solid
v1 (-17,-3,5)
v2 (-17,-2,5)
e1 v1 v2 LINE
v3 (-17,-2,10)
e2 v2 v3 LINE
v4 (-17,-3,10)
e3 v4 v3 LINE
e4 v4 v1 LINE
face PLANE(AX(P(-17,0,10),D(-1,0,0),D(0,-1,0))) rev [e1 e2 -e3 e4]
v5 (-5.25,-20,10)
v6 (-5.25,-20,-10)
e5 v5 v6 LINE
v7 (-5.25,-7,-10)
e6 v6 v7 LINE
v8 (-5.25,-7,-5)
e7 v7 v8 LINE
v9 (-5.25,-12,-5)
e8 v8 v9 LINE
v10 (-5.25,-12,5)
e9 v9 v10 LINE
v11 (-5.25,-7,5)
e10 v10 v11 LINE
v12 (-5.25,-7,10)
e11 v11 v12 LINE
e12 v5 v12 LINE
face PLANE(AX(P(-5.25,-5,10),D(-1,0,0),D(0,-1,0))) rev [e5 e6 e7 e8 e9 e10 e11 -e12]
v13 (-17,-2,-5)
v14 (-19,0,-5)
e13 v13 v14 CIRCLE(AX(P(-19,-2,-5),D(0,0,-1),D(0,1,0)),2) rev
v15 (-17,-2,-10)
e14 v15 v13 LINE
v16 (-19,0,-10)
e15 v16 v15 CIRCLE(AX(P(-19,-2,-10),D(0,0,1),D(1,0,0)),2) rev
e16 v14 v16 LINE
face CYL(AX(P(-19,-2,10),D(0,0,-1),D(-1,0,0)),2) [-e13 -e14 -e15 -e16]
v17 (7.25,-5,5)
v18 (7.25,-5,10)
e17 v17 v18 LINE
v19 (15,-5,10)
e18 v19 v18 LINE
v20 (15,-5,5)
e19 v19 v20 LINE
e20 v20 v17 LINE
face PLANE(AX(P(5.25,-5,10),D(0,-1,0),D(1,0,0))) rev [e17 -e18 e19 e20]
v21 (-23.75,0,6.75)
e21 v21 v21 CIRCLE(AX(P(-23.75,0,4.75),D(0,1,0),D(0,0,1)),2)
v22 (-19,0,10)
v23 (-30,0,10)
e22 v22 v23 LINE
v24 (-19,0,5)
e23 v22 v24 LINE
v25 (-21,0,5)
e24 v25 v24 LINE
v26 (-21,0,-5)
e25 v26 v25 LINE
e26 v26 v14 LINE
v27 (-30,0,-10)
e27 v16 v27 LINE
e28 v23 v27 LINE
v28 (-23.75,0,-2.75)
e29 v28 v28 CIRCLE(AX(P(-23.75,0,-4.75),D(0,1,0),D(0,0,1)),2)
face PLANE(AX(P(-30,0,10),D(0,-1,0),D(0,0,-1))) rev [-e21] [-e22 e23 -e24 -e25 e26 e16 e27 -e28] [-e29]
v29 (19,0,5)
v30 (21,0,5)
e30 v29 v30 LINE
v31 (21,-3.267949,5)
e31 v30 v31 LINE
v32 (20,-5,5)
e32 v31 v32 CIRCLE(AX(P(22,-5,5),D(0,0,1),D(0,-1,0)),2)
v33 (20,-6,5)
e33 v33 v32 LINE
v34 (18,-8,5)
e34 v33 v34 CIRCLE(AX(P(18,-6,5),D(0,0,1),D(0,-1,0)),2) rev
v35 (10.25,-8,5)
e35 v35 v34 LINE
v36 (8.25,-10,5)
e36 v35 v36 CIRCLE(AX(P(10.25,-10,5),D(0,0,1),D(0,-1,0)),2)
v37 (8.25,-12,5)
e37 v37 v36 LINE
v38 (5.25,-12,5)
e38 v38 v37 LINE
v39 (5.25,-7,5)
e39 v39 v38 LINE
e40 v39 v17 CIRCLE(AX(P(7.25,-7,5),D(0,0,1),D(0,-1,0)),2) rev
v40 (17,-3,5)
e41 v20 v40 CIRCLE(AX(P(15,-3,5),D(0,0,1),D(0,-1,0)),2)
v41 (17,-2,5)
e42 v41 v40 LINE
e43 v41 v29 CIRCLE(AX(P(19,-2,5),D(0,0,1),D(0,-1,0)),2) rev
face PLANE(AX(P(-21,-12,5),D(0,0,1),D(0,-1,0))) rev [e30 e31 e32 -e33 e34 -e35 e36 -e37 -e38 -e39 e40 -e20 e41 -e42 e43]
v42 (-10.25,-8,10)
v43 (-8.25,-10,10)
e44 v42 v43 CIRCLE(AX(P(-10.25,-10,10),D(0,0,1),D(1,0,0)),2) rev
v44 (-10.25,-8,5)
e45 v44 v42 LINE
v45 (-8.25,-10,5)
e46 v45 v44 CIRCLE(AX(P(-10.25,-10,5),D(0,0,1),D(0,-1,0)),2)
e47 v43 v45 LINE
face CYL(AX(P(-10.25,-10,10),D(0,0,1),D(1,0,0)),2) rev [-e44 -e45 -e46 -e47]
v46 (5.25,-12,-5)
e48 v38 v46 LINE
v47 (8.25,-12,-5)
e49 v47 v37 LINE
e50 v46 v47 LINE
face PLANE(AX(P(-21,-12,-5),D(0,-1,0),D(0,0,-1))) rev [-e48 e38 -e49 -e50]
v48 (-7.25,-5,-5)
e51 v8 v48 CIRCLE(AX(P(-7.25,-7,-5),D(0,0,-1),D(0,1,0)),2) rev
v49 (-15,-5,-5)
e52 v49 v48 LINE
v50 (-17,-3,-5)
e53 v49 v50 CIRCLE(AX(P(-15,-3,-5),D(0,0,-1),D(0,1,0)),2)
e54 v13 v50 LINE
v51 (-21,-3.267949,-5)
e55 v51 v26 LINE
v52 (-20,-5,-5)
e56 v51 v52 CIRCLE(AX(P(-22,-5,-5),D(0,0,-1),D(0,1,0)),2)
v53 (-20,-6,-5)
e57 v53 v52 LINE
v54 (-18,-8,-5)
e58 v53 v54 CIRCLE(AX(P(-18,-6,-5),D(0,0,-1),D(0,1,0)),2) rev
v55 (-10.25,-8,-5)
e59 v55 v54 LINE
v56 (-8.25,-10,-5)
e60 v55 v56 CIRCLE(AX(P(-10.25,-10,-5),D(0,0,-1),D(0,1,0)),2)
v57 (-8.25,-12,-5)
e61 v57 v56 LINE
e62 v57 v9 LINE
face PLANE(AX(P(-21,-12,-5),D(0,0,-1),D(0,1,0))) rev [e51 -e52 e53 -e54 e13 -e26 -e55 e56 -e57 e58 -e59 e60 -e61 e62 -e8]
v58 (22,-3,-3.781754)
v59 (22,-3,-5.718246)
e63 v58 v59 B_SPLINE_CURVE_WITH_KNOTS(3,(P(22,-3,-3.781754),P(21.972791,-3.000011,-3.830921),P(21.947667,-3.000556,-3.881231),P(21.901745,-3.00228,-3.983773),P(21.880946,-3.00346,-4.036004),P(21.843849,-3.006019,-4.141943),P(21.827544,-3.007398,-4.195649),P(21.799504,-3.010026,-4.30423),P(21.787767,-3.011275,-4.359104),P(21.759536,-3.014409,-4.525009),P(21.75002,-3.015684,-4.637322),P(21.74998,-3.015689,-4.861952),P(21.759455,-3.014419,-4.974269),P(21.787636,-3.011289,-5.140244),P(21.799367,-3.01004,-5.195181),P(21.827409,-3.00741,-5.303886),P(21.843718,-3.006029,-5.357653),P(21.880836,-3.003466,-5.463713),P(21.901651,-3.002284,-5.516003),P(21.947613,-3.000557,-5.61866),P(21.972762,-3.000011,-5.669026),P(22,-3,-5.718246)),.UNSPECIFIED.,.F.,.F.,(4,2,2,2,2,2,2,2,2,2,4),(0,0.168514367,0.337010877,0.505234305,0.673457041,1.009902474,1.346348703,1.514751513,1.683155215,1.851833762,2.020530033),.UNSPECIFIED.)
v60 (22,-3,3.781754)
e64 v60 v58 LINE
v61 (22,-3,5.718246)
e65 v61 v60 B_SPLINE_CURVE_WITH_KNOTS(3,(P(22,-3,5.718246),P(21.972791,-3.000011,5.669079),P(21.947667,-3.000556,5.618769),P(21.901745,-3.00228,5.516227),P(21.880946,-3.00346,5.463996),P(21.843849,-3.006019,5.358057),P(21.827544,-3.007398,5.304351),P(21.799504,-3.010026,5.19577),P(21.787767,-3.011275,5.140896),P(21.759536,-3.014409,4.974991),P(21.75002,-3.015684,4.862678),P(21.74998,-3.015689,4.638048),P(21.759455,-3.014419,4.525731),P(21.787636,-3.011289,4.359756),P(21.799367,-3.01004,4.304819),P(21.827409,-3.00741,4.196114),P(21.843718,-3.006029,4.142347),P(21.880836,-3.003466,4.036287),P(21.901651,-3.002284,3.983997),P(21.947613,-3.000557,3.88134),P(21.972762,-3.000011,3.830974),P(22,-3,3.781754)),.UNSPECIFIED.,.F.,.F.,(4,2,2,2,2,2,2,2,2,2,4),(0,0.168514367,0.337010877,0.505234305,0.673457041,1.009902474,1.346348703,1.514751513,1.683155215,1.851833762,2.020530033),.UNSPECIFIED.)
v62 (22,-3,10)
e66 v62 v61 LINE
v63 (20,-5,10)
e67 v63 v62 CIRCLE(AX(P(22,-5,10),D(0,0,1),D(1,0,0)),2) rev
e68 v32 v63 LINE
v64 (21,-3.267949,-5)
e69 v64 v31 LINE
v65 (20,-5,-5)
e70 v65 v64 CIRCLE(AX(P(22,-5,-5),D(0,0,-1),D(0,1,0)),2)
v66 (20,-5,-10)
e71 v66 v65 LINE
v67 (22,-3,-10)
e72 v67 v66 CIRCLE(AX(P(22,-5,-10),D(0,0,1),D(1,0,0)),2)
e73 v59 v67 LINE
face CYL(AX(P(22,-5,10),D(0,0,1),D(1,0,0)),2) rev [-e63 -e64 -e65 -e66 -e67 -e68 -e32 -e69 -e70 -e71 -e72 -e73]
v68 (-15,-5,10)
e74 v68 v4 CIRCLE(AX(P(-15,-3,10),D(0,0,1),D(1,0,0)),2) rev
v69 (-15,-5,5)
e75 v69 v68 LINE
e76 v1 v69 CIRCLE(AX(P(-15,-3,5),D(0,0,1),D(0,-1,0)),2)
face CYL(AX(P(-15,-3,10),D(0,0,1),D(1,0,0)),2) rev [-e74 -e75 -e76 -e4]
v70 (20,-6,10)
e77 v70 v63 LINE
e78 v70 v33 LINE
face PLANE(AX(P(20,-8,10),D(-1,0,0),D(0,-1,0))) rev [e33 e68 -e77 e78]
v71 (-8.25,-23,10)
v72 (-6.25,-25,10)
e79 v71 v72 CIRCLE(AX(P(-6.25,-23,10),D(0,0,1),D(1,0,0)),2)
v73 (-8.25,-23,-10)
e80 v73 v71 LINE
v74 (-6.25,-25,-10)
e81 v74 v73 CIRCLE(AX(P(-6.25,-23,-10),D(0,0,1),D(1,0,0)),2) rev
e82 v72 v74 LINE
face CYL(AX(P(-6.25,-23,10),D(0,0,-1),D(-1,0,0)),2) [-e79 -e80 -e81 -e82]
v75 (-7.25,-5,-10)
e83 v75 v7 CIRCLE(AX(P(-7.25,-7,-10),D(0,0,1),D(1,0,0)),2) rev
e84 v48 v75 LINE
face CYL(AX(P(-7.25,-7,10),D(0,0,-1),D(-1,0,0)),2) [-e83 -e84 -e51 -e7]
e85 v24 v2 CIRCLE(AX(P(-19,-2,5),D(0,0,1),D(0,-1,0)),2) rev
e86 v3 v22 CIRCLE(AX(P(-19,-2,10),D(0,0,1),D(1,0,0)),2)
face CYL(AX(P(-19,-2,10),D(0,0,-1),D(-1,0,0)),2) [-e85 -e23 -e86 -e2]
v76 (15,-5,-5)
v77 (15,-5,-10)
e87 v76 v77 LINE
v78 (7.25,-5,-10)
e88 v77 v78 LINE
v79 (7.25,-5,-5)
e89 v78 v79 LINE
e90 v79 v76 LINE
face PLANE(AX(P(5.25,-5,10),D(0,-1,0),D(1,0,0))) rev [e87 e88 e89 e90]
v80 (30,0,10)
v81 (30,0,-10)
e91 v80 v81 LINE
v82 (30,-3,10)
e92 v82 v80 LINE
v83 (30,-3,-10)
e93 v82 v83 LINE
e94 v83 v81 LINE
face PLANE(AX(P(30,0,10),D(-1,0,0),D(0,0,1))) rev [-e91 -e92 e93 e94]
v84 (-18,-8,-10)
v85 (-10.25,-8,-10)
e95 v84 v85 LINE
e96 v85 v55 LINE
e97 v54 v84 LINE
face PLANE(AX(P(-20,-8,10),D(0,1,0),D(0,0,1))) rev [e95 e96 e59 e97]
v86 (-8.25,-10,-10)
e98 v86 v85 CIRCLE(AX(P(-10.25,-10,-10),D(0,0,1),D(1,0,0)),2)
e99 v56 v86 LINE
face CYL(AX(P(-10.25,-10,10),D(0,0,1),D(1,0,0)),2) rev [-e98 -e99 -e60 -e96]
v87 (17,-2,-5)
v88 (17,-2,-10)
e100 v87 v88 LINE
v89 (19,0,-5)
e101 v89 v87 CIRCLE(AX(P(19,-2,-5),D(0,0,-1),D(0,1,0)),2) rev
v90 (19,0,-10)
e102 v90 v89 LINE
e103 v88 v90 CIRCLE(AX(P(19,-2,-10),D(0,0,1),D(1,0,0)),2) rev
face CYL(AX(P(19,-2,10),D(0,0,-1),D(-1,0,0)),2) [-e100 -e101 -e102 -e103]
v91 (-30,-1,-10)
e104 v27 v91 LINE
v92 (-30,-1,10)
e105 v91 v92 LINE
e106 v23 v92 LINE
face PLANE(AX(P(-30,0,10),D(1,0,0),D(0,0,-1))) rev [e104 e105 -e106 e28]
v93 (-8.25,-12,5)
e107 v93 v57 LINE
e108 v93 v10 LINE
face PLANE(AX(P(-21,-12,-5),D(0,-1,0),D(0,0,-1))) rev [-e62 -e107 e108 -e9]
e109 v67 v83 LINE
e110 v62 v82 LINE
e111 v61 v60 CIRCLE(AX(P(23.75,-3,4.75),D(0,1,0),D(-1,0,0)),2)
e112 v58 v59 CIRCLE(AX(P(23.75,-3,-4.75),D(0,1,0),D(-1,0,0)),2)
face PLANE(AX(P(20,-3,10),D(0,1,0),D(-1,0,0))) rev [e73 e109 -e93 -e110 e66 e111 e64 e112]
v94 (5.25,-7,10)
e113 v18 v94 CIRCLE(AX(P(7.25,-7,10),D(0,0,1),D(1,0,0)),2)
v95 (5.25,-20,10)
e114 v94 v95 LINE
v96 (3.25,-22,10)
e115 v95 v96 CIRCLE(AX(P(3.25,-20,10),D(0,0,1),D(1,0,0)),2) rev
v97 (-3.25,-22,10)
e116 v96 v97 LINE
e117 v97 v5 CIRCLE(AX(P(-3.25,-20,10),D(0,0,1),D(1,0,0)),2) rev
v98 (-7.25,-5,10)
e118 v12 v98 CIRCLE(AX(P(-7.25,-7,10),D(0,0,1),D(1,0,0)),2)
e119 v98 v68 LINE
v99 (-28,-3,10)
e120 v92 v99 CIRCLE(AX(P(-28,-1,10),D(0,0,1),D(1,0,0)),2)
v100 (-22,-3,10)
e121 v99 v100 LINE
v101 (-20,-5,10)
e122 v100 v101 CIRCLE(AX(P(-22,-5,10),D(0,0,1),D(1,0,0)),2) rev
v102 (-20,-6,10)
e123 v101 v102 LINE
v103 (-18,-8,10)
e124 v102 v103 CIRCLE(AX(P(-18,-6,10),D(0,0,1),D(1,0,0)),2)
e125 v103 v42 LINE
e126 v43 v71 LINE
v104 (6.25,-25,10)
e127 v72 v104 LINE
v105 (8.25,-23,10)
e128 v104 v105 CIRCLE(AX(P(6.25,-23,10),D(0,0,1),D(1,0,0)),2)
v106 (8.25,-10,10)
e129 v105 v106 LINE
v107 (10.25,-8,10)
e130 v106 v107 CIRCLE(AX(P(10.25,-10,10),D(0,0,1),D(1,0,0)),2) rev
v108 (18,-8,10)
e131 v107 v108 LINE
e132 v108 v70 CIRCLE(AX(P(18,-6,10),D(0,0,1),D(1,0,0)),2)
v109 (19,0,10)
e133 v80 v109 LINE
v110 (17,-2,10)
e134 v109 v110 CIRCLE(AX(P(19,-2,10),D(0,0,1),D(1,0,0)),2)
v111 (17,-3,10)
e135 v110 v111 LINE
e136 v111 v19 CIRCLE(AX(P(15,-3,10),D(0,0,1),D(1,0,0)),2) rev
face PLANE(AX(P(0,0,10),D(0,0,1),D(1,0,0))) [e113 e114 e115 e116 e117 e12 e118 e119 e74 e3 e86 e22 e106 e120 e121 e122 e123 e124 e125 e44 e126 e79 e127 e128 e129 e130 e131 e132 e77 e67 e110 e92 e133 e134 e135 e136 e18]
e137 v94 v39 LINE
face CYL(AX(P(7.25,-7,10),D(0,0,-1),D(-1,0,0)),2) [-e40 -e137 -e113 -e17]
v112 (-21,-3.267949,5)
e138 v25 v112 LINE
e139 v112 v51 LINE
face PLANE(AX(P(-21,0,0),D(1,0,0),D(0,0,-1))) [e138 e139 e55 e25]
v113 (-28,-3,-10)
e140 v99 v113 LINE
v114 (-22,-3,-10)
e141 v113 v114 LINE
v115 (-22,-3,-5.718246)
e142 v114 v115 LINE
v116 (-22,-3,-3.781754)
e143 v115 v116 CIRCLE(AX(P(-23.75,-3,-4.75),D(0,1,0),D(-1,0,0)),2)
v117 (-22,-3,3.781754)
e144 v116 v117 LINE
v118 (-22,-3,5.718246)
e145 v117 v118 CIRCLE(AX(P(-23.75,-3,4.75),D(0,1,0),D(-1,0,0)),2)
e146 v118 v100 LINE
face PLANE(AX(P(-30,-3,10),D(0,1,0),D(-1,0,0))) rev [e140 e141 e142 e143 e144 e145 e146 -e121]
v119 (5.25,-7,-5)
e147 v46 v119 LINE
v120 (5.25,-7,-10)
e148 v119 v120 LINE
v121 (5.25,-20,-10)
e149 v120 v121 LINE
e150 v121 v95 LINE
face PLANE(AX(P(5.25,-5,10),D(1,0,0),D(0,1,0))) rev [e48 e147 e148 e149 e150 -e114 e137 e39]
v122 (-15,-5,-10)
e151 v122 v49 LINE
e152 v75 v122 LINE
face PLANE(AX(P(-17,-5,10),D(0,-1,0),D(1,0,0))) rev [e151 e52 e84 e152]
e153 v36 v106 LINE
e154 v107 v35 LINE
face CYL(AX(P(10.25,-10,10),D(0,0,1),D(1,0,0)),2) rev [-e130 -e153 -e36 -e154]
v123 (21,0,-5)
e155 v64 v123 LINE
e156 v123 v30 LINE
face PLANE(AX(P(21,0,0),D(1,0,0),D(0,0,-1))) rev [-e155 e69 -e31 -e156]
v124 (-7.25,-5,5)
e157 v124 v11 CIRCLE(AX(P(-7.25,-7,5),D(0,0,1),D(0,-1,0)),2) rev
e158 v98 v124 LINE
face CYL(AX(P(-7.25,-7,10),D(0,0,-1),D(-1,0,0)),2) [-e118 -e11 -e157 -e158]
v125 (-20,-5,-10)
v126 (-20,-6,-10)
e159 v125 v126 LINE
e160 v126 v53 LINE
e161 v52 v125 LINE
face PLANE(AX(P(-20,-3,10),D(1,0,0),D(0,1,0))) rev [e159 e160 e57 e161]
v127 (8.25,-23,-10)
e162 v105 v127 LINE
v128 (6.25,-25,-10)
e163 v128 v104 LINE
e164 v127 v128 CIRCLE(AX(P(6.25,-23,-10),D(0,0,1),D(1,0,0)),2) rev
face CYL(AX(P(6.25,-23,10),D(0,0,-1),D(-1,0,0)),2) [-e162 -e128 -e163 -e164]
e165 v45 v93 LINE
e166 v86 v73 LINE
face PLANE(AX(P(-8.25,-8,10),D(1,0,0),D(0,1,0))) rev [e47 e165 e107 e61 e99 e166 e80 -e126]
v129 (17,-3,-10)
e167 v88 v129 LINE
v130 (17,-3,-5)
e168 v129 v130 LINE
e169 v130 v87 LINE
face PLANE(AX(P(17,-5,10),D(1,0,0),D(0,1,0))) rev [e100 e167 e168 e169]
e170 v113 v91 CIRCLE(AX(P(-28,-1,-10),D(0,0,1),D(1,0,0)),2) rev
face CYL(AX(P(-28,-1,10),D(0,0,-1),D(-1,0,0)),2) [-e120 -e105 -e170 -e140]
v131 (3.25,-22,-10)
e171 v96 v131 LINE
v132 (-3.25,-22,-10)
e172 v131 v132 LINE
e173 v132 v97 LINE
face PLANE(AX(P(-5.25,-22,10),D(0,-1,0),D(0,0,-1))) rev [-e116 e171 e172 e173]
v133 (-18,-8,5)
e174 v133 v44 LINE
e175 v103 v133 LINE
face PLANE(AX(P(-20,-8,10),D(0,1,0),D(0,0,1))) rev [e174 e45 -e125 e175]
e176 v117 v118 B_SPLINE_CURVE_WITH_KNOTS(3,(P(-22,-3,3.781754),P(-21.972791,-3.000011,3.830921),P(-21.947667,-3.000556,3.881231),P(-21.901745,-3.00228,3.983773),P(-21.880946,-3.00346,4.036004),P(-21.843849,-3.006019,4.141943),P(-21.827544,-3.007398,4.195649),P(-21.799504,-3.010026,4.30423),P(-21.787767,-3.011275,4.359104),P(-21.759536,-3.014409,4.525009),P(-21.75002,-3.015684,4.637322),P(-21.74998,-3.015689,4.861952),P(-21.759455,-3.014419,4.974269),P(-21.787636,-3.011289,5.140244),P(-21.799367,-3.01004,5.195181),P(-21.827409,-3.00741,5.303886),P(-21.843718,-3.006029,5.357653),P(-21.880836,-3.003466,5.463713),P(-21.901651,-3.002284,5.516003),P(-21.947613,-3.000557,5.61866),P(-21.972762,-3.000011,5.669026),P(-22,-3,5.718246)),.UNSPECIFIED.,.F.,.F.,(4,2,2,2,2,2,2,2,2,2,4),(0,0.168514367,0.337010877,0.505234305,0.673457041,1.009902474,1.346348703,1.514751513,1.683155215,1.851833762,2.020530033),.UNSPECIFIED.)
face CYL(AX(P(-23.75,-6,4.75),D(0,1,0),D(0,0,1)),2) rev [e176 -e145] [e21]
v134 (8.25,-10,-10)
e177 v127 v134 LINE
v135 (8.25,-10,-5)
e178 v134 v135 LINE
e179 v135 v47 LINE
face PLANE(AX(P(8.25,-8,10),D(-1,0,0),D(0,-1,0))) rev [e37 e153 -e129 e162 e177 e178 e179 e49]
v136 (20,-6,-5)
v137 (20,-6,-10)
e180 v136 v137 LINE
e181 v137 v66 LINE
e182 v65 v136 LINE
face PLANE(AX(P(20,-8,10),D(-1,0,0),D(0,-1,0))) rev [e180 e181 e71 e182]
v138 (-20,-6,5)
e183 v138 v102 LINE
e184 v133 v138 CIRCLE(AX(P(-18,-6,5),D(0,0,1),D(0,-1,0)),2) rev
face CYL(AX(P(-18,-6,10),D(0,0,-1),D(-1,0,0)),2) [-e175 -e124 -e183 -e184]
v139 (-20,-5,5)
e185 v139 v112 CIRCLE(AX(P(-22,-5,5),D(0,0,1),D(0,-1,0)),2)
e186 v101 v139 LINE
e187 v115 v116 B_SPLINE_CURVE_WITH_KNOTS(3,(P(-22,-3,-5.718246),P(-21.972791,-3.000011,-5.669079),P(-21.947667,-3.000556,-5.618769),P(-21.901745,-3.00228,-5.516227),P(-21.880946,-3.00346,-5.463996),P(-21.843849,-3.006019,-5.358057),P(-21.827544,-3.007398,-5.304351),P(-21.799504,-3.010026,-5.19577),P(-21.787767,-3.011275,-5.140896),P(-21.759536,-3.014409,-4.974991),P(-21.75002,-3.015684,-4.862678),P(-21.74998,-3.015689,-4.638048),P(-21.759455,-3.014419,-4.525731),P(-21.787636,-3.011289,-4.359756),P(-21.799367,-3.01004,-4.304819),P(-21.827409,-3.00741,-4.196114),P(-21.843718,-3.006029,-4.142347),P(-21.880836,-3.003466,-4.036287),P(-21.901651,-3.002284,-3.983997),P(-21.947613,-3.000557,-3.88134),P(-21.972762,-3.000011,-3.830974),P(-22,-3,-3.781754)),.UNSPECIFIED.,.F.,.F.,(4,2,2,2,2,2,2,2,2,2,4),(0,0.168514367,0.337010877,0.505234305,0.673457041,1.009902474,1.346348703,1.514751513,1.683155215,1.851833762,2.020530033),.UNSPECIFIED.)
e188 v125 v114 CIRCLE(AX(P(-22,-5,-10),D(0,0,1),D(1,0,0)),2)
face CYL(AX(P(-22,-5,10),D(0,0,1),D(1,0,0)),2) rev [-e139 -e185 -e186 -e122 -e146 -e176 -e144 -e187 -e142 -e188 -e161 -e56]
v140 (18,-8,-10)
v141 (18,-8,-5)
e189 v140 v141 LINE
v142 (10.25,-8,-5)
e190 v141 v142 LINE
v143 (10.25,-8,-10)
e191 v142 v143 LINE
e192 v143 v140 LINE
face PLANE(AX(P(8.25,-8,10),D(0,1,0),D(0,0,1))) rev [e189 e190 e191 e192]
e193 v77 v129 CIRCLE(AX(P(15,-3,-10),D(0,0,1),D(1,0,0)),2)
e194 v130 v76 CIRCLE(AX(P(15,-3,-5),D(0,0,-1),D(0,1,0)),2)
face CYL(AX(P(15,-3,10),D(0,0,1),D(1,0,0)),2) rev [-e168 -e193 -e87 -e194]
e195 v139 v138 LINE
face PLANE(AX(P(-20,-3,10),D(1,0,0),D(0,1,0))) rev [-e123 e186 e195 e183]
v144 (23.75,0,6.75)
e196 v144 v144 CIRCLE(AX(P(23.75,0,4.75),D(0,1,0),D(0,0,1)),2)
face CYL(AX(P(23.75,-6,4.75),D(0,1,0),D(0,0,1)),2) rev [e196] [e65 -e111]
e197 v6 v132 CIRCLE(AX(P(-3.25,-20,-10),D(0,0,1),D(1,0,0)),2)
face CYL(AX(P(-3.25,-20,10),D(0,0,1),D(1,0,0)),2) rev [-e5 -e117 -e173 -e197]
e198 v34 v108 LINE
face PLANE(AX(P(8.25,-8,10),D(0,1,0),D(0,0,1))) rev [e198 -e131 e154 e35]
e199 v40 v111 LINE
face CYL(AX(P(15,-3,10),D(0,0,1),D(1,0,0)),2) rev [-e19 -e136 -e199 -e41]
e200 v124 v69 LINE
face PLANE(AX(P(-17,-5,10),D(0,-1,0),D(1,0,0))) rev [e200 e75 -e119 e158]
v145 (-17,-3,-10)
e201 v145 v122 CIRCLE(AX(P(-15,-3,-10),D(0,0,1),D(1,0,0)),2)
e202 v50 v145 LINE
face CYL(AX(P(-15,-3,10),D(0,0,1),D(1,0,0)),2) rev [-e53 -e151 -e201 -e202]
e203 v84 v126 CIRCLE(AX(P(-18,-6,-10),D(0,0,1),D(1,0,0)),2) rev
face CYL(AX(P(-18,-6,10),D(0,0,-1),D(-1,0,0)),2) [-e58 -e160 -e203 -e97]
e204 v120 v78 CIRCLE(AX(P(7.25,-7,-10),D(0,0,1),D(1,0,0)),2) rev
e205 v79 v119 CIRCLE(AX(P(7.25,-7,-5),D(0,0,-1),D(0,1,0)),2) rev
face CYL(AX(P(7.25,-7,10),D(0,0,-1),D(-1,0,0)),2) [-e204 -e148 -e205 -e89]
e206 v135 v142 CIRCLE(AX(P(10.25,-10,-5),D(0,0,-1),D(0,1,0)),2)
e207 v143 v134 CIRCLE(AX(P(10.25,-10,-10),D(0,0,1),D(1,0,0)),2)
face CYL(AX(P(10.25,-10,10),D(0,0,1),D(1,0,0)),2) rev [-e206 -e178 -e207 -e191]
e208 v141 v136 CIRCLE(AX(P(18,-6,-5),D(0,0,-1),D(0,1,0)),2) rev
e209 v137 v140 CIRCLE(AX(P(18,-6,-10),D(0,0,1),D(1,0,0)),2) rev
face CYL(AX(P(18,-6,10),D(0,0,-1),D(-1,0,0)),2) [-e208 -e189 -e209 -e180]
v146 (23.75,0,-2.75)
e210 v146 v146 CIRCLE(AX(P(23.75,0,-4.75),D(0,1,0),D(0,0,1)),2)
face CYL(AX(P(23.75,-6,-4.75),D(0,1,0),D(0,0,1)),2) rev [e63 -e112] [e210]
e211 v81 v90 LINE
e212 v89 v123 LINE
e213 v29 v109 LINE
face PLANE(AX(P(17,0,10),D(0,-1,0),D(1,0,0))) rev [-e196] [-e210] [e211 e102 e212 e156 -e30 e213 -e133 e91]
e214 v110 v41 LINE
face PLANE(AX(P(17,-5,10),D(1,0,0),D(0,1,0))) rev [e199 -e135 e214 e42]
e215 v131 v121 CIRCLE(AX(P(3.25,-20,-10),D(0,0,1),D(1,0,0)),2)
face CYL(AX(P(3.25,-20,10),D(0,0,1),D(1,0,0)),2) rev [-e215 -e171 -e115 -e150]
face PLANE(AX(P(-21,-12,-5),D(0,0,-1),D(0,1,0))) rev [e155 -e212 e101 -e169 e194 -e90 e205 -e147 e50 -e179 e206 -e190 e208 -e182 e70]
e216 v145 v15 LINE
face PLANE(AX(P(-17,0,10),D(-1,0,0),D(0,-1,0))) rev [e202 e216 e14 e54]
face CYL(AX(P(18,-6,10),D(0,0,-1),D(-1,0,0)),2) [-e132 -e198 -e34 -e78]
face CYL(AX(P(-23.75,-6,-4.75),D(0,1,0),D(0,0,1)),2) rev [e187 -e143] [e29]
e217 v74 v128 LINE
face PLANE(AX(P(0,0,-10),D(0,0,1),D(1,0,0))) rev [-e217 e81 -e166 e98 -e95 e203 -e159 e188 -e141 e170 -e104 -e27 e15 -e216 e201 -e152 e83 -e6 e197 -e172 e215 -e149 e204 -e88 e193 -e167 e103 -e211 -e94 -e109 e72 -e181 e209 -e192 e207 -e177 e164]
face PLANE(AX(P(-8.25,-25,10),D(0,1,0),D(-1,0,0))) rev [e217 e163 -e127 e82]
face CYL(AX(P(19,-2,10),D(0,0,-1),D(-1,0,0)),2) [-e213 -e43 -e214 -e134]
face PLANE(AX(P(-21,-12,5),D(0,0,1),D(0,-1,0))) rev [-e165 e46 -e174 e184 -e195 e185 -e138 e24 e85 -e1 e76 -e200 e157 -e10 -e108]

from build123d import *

# Parameters (mm, degrees)
BOSS_EXTRUDE1_DEPTH = 10
SKETCH2_R           = 2
CUT_EXTRUDE1_DEPTH  = 6
SKETCH3_W           = 10
SKETCH3_H           = 12
CUT_EXTRUDE2_DEPTH  = 21
FILLET1_R           = 2


with BuildPart() as part:
    # Sketch1 → Boss-Extrude1 (new, symmetric)
    with BuildSketch(Plane.XY):
        Polygon((-30, 0), (-17, 0), (-17, -5), (-5.25, -5), (-5.25, -22), (5.25, -22), (5.25, -5), (17, -5), (17, 0), (30, 0), (30, -3), (20, -3), (20, -8), (8.25, -8), (8.25, -25), (-8.25, -25), (-8.25, -8), (-20, -8), (-20, -3), (-30, -3), align=None)
    extrude(amount=BOSS_EXTRUDE1_DEPTH, both=True)

    # Sketch2 → Cut-Extrude1 (cut)
    with BuildSketch(Plane(origin=(0, 0, 0), x_dir=(1, 0, 0), z_dir=(0, 1, 0))):
        with Locations(Location((-23.75, 4.75, 0), (0, 0, 270))):
            Circle(SKETCH2_R)
        with Locations(Location((-23.75, -4.75, 0), (0, 0, 270))):
            Circle(SKETCH2_R)
        with Locations(Location((23.75, 4.75, 0), (0, 0, 270))):
            Circle(SKETCH2_R)
        with Locations(Location((23.75, -4.75, 0), (0, 0, 270))):
            Circle(SKETCH2_R)
    extrude(amount=-CUT_EXTRUDE1_DEPTH, mode=Mode.SUBTRACT)

    # Sketch3 → Cut-Extrude2 (cut, symmetric)
    with BuildSketch(Plane(origin=(0, 0, 0), x_dir=(0, 0, -1), z_dir=(1, 0, 0))):
        with Locations((0, -6)):
            Rectangle(SKETCH3_W, SKETCH3_H)
    extrude(amount=CUT_EXTRUDE2_DEPTH, both=True, mode=Mode.SUBTRACT)

    # Fillet1
    # the kernel refuses this fillet: 2 mm, written as the material it adds along each edge
    with BuildSketch(Plane(origin=(-17, -5, 10), x_dir=(0, 1, 0), z_dir=(0, 0, -1)), Plane(origin=(17, -5, 10), x_dir=(-1, 0, 0), z_dir=(0, 0, -1)), Plane(origin=(8.25, -8, 10), x_dir=(1, 0, 0), z_dir=(0, 0, -1)), Plane(origin=(-8.25, -8, 10), x_dir=(0, -1, 0), z_dir=(0, 0, -1)), Plane(origin=(-17, -5, -5), x_dir=(0, 1, 0), z_dir=(0, 0, -1)), Plane(origin=(17, -5, -5), x_dir=(-1, 0, 0), z_dir=(0, 0, -1)), Plane(origin=(-8.25, -8, -5), x_dir=(0, -1, 0), z_dir=(0, 0, -1))) as fillet1_piece_1:
        with BuildLine():
            CenterArc((FILLET1_R, FILLET1_R), FILLET1_R, 180, 90)
            Line((0, FILLET1_R), (0, 0))
            Line((0, 0), (FILLET1_R, 0))
        make_face()
    extrude(amount=5)
    with BuildSketch(Plane(origin=(-5.25, -22, 10), x_dir=(0, 1, 0), z_dir=(0, 0, -1)), Plane(origin=(5.25, -22, 10), x_dir=(-1, 0, 0), z_dir=(0, 0, -1))) as fillet1_piece_2:
        with BuildLine():
            CenterArc((FILLET1_R, FILLET1_R), FILLET1_R, 180, 90)
            Line((0, FILLET1_R), (0, 0))
            Line((0, 0), (FILLET1_R, 0))
        make_face()
    extrude(amount=20)
    with BuildSketch(Plane(origin=(20, -3, 10), x_dir=(1, 0, 0), z_dir=(0, 0, -1))) as fillet1_piece_3_section:
        with BuildLine():
            CenterArc((FILLET1_R, FILLET1_R), FILLET1_R, 180, 90)
            Line((0, FILLET1_R), (0, 0))
            Line((0, 0), (FILLET1_R, 0))
        make_face()
    fillet1_piece_3 = extrude(amount=5, mode=Mode.PRIVATE)
    fillet1_piece_3 = split(fillet1_piece_3, bisect_by=Plane(origin=(21, -3.048479196, 7.515597856), z_dir=(1, 0, 0)), keep=Keep.TOP, mode=Mode.PRIVATE)
    fillet1_piece_3 = fillet1_piece_3 - Plane(origin=(23.75, -3.048479196, 4.75), x_dir=(0, 0, 1), z_dir=(0, 1, 0)) * Cylinder(2, 18, mode=Mode.PRIVATE)
    add(fillet1_piece_3)
    with BuildSketch(Plane(origin=(20, -3, 10), x_dir=(1, 0, 0), z_dir=(0, 0, -1))) as fillet1_piece_4_section:
        with BuildLine():
            CenterArc((FILLET1_R, FILLET1_R), FILLET1_R, 180, 90)
            Line((0, FILLET1_R), (0, 0))
            Line((0, 0), (FILLET1_R, 0))
        make_face()
    fillet1_piece_4 = extrude(amount=5, mode=Mode.PRIVATE)
    fillet1_piece_4 = split(fillet1_piece_4, bisect_by=Plane(origin=(21, -3.51024012, 7.5), z_dir=(-1, 0, 0)), keep=Keep.TOP, mode=Mode.PRIVATE)
    add(fillet1_piece_4)
    with BuildSketch(Plane(origin=(20, -3, 10), x_dir=(1, 0, 0), z_dir=(0, 0, -1))) as fillet1_piece_5_section:
        with BuildLine():
            CenterArc((FILLET1_R, FILLET1_R), FILLET1_R, 180, 90)
            Line((0, FILLET1_R), (0, 0))
            Line((0, 0), (FILLET1_R, 0))
        make_face()
    fillet1_piece_5 = extrude(amount=10, mode=Mode.PRIVATE)
    fillet1_piece_5 = split(fillet1_piece_5, bisect_by=Plane(origin=(21.317615257, -3.049059645, 5), z_dir=(0, 0, -1)), keep=Keep.TOP, mode=Mode.PRIVATE)
    fillet1_piece_5 = split(fillet1_piece_5, bisect_by=Plane(origin=(21, -3.049059645, 2.467907611), z_dir=(1, 0, 0)), keep=Keep.TOP, mode=Mode.PRIVATE)
    fillet1_piece_5 = fillet1_piece_5 - Plane(origin=(23.75, -3.049059645, 4.75), x_dir=(0, 0, 1), z_dir=(0, 1, 0)) * Cylinder(2, 28, mode=Mode.PRIVATE)
    add(fillet1_piece_5)
    with BuildSketch(Plane(origin=(-20, -3, 0), x_dir=(-1, 0, 0), z_dir=(0, 0, 1))) as fillet1_piece_6_section:
        with BuildLine():
            CenterArc((FILLET1_R, FILLET1_R), FILLET1_R, 180, 90)
            Line((0, FILLET1_R), (0, 0))
            Line((0, 0), (FILLET1_R, 0))
        make_face()
    fillet1_piece_6 = extrude(amount=10, mode=Mode.PRIVATE)
    fillet1_piece_6 = split(fillet1_piece_6, bisect_by=Plane(origin=(-21.317615257, -3.049059645, 5), z_dir=(0, 0, -1)), keep=Keep.TOP, mode=Mode.PRIVATE)
    fillet1_piece_6 = split(fillet1_piece_6, bisect_by=Plane(origin=(-21, -3.049059645, 2.46790761), z_dir=(-1, 0, 0)), keep=Keep.TOP, mode=Mode.PRIVATE)
    fillet1_piece_6 = fillet1_piece_6 - Plane(origin=(-23.75, -3.049059645, 4.75), x_dir=(0, 0, 1), z_dir=(0, 1, 0)) * Cylinder(2, 28, mode=Mode.PRIVATE)
    add(fillet1_piece_6)
    with BuildSketch(Plane(origin=(-20, -3, 5), x_dir=(-1, 0, 0), z_dir=(0, 0, 1))) as fillet1_piece_7_section:
        with BuildLine():
            CenterArc((FILLET1_R, FILLET1_R), FILLET1_R, 180, 90)
            Line((0, FILLET1_R), (0, 0))
            Line((0, 0), (FILLET1_R, 0))
        make_face()
    fillet1_piece_7 = extrude(amount=5, mode=Mode.PRIVATE)
    fillet1_piece_7 = split(fillet1_piece_7, bisect_by=Plane(origin=(-21, -3.048479196, 7.515597855), z_dir=(-1, 0, 0)), keep=Keep.TOP, mode=Mode.PRIVATE)
    fillet1_piece_7 = fillet1_piece_7 - Plane(origin=(-23.75, -3.048479196, 4.75), x_dir=(0, 0, 1), z_dir=(0, 1, 0)) * Cylinder(2, 18, mode=Mode.PRIVATE)
    add(fillet1_piece_7)
    with BuildSketch(Plane(origin=(-20, -3, 5), x_dir=(-1, 0, 0), z_dir=(0, 0, 1))) as fillet1_piece_8_section:
        with BuildLine():
            CenterArc((FILLET1_R, FILLET1_R), FILLET1_R, 180, 90)
            Line((0, FILLET1_R), (0, 0))
            Line((0, 0), (FILLET1_R, 0))
        make_face()
    fillet1_piece_8 = extrude(amount=5, mode=Mode.PRIVATE)
    fillet1_piece_8 = split(fillet1_piece_8, bisect_by=Plane(origin=(-21, -3.51024012, 7.5), z_dir=(1, 0, 0)), keep=Keep.TOP, mode=Mode.PRIVATE)
    add(fillet1_piece_8)
    with BuildSketch(Plane(origin=(20, -3, 0), x_dir=(1, 0, 0), z_dir=(0, 0, -1))) as fillet1_piece_9_section:
        with BuildLine():
            CenterArc((FILLET1_R, FILLET1_R), FILLET1_R, 180, 90)
            Line((0, FILLET1_R), (0, 0))
            Line((0, 0), (FILLET1_R, 0))
        make_face()
    fillet1_piece_9 = extrude(amount=10, mode=Mode.PRIVATE)
    fillet1_piece_9 = split(fillet1_piece_9, bisect_by=Plane(origin=(21, -3.049059645, -2.46790761), z_dir=(1, 0, 0)), keep=Keep.TOP, mode=Mode.PRIVATE)
    fillet1_piece_9 = split(fillet1_piece_9, bisect_by=Plane(origin=(21.317615257, -3.049059645, -5), z_dir=(0, 0, 1)), keep=Keep.TOP, mode=Mode.PRIVATE)
    fillet1_piece_9 = fillet1_piece_9 - Plane(origin=(23.75, -3.049059645, -4.75), x_dir=(0, 0, 1), z_dir=(0, 1, 0)) * Cylinder(2, 28, mode=Mode.PRIVATE)
    add(fillet1_piece_9)
    with BuildSketch(Plane(origin=(20, -3, -5), x_dir=(1, 0, 0), z_dir=(0, 0, -1))) as fillet1_piece_10_section:
        with BuildLine():
            CenterArc((FILLET1_R, FILLET1_R), FILLET1_R, 180, 90)
            Line((0, FILLET1_R), (0, 0))
            Line((0, 0), (FILLET1_R, 0))
        make_face()
    fillet1_piece_10 = extrude(amount=5, mode=Mode.PRIVATE)
    fillet1_piece_10 = split(fillet1_piece_10, bisect_by=Plane(origin=(21, -3.048479196, -7.515597854), z_dir=(1, 0, 0)), keep=Keep.TOP, mode=Mode.PRIVATE)
    fillet1_piece_10 = fillet1_piece_10 - Plane(origin=(23.75, -3.048479196, -4.75), x_dir=(0, 0, 1), z_dir=(0, 1, 0)) * Cylinder(2, 18, mode=Mode.PRIVATE)
    add(fillet1_piece_10)
    with BuildSketch(Plane(origin=(20, -3, -5), x_dir=(1, 0, 0), z_dir=(0, 0, -1))) as fillet1_piece_11_section:
        with BuildLine():
            CenterArc((FILLET1_R, FILLET1_R), FILLET1_R, 180, 90)
            Line((0, FILLET1_R), (0, 0))
            Line((0, 0), (FILLET1_R, 0))
        make_face()
    fillet1_piece_11 = extrude(amount=5, mode=Mode.PRIVATE)
    fillet1_piece_11 = split(fillet1_piece_11, bisect_by=Plane(origin=(21, -3.51024012, -7.5), z_dir=(-1, 0, 0)), keep=Keep.TOP, mode=Mode.PRIVATE)
    add(fillet1_piece_11)
    with BuildSketch(Plane(origin=(8.25, -8, -5), x_dir=(0, -1, 0), z_dir=(0, 0, -1))) as fillet1_piece_12:
        with BuildLine():
            CenterArc((FILLET1_R, -FILLET1_R), FILLET1_R, 90, 90)
            Line((0, -FILLET1_R), (0, 0))
            Line((0, 0), (FILLET1_R, 0))
        make_face()
    extrude(amount=5)
    with BuildSketch(Plane(origin=(-20, -3, -10), x_dir=(-1, 0, 0), z_dir=(0, 0, 1))) as fillet1_piece_13_section:
        with BuildLine():
            CenterArc((FILLET1_R, FILLET1_R), FILLET1_R, 180, 90)
            Line((0, FILLET1_R), (0, 0))
            Line((0, 0), (FILLET1_R, 0))
        make_face()
    fillet1_piece_13 = extrude(amount=5, mode=Mode.PRIVATE)
    fillet1_piece_13 = split(fillet1_piece_13, bisect_by=Plane(origin=(-21, -3.048479196, -7.515597855), z_dir=(-1, 0, 0)), keep=Keep.TOP, mode=Mode.PRIVATE)
    fillet1_piece_13 = fillet1_piece_13 - Plane(origin=(-23.75, -3.048479196, -4.75), x_dir=(0, 0, 1), z_dir=(0, 1, 0)) * Cylinder(2, 18, mode=Mode.PRIVATE)
    add(fillet1_piece_13)
    with BuildSketch(Plane(origin=(-20, -3, -10), x_dir=(-1, 0, 0), z_dir=(0, 0, 1))) as fillet1_piece_14_section:
        with BuildLine():
            CenterArc((FILLET1_R, FILLET1_R), FILLET1_R, 180, 90)
            Line((0, FILLET1_R), (0, 0))
            Line((0, 0), (FILLET1_R, 0))
        make_face()
    fillet1_piece_14 = extrude(amount=5, mode=Mode.PRIVATE)
    fillet1_piece_14 = split(fillet1_piece_14, bisect_by=Plane(origin=(-21, -3.51024012, -7.5), z_dir=(1, 0, 0)), keep=Keep.TOP, mode=Mode.PRIVATE)
    add(fillet1_piece_14)
    with BuildSketch(Plane(origin=(-20, -3, -10), x_dir=(-1, 0, 0), z_dir=(0, 0, 1))) as fillet1_piece_15_section:
        with BuildLine():
            CenterArc((FILLET1_R, FILLET1_R), FILLET1_R, 180, 90)
            Line((0, FILLET1_R), (0, 0))
            Line((0, 0), (FILLET1_R, 0))
        make_face()
    fillet1_piece_15 = extrude(amount=10, mode=Mode.PRIVATE)
    fillet1_piece_15 = split(fillet1_piece_15, bisect_by=Plane(origin=(-21, -3.049059645, -2.467907611), z_dir=(-1, 0, 0)), keep=Keep.TOP, mode=Mode.PRIVATE)
    fillet1_piece_15 = split(fillet1_piece_15, bisect_by=Plane(origin=(-21.317615257, -3.049059645, -5), z_dir=(0, 0, 1)), keep=Keep.TOP, mode=Mode.PRIVATE)
    fillet1_piece_15 = fillet1_piece_15 - Plane(origin=(-23.75, -3.049059645, -4.75), x_dir=(0, 0, 1), z_dir=(0, 1, 0)) * Cylinder(2, 28, mode=Mode.PRIVATE)
    add(fillet1_piece_15)
    # the kernel refuses this fillet: 2 mm, written as the material it takes off along each edge
    with BuildSketch(Plane(origin=(-17, 0, 15), x_dir=(-1, 0, 0), z_dir=(0, 0, -1)), Plane(origin=(20, -8, 15), x_dir=(0, 1, 0), z_dir=(0, 0, -1)), Plane(origin=(-20, -8, 15), x_dir=(1, 0, 0), z_dir=(0, 0, -1)), Plane(origin=(-17, 0, 0), x_dir=(-1, 0, 0), z_dir=(0, 0, -1)), Plane(origin=(5.25, -5, 0), x_dir=(0, -1, 0), z_dir=(0, 0, -1))) as fillet1_2_piece_1:
        with BuildLine():
            CenterArc((FILLET1_R, -FILLET1_R), FILLET1_R, 90, 90)
            Line((0, -FILLET1_R), (0, 0))
            Line((0, 0), (FILLET1_R, 0))
        make_face()
    extrude(amount=15, mode=Mode.SUBTRACT)
    with BuildSketch(Plane(origin=(-5.25, -5, 15), x_dir=(0, -1, 0), z_dir=(0, 0, -1)), Plane(origin=(5.25, -5, 15), x_dir=(1, 0, 0), z_dir=(0, 0, -1)), Plane(origin=(17, 0, 15), x_dir=(1, 0, 0), z_dir=(0, 0, -1)), Plane(origin=(-5.25, -5, 0), x_dir=(0, -1, 0), z_dir=(0, 0, -1)), Plane(origin=(17, 0, 0), x_dir=(1, 0, 0), z_dir=(0, 0, -1)), Plane(origin=(20, -8, 0), x_dir=(-1, 0, 0), z_dir=(0, 0, -1)), Plane(origin=(-20, -8, 0), x_dir=(0, 1, 0), z_dir=(0, 0, -1))) as fillet1_2_piece_2:
        with BuildLine():
            CenterArc((FILLET1_R, FILLET1_R), FILLET1_R, 180, 90)
            Line((0, FILLET1_R), (0, 0))
            Line((0, 0), (FILLET1_R, 0))
        make_face()
    extrude(amount=15, mode=Mode.SUBTRACT)
    with BuildSketch(Plane(origin=(8.25, -25, 15), x_dir=(-1, 0, 0), z_dir=(0, 0, -1)), Plane(origin=(-8.25, -25, 15), x_dir=(0, 1, 0), z_dir=(0, 0, -1)), Plane(origin=(-30, -3, -15), x_dir=(1, 0, 0), z_dir=(0, 0, 1))) as fillet1_2_piece_3:
        with BuildLine():
            CenterArc((FILLET1_R, FILLET1_R), FILLET1_R, 180, 90)
            Line((0, FILLET1_R), (0, 0))
            Line((0, 0), (FILLET1_R, 0))
        make_face()
    extrude(amount=30, mode=Mode.SUBTRACT)


solid = part.part
